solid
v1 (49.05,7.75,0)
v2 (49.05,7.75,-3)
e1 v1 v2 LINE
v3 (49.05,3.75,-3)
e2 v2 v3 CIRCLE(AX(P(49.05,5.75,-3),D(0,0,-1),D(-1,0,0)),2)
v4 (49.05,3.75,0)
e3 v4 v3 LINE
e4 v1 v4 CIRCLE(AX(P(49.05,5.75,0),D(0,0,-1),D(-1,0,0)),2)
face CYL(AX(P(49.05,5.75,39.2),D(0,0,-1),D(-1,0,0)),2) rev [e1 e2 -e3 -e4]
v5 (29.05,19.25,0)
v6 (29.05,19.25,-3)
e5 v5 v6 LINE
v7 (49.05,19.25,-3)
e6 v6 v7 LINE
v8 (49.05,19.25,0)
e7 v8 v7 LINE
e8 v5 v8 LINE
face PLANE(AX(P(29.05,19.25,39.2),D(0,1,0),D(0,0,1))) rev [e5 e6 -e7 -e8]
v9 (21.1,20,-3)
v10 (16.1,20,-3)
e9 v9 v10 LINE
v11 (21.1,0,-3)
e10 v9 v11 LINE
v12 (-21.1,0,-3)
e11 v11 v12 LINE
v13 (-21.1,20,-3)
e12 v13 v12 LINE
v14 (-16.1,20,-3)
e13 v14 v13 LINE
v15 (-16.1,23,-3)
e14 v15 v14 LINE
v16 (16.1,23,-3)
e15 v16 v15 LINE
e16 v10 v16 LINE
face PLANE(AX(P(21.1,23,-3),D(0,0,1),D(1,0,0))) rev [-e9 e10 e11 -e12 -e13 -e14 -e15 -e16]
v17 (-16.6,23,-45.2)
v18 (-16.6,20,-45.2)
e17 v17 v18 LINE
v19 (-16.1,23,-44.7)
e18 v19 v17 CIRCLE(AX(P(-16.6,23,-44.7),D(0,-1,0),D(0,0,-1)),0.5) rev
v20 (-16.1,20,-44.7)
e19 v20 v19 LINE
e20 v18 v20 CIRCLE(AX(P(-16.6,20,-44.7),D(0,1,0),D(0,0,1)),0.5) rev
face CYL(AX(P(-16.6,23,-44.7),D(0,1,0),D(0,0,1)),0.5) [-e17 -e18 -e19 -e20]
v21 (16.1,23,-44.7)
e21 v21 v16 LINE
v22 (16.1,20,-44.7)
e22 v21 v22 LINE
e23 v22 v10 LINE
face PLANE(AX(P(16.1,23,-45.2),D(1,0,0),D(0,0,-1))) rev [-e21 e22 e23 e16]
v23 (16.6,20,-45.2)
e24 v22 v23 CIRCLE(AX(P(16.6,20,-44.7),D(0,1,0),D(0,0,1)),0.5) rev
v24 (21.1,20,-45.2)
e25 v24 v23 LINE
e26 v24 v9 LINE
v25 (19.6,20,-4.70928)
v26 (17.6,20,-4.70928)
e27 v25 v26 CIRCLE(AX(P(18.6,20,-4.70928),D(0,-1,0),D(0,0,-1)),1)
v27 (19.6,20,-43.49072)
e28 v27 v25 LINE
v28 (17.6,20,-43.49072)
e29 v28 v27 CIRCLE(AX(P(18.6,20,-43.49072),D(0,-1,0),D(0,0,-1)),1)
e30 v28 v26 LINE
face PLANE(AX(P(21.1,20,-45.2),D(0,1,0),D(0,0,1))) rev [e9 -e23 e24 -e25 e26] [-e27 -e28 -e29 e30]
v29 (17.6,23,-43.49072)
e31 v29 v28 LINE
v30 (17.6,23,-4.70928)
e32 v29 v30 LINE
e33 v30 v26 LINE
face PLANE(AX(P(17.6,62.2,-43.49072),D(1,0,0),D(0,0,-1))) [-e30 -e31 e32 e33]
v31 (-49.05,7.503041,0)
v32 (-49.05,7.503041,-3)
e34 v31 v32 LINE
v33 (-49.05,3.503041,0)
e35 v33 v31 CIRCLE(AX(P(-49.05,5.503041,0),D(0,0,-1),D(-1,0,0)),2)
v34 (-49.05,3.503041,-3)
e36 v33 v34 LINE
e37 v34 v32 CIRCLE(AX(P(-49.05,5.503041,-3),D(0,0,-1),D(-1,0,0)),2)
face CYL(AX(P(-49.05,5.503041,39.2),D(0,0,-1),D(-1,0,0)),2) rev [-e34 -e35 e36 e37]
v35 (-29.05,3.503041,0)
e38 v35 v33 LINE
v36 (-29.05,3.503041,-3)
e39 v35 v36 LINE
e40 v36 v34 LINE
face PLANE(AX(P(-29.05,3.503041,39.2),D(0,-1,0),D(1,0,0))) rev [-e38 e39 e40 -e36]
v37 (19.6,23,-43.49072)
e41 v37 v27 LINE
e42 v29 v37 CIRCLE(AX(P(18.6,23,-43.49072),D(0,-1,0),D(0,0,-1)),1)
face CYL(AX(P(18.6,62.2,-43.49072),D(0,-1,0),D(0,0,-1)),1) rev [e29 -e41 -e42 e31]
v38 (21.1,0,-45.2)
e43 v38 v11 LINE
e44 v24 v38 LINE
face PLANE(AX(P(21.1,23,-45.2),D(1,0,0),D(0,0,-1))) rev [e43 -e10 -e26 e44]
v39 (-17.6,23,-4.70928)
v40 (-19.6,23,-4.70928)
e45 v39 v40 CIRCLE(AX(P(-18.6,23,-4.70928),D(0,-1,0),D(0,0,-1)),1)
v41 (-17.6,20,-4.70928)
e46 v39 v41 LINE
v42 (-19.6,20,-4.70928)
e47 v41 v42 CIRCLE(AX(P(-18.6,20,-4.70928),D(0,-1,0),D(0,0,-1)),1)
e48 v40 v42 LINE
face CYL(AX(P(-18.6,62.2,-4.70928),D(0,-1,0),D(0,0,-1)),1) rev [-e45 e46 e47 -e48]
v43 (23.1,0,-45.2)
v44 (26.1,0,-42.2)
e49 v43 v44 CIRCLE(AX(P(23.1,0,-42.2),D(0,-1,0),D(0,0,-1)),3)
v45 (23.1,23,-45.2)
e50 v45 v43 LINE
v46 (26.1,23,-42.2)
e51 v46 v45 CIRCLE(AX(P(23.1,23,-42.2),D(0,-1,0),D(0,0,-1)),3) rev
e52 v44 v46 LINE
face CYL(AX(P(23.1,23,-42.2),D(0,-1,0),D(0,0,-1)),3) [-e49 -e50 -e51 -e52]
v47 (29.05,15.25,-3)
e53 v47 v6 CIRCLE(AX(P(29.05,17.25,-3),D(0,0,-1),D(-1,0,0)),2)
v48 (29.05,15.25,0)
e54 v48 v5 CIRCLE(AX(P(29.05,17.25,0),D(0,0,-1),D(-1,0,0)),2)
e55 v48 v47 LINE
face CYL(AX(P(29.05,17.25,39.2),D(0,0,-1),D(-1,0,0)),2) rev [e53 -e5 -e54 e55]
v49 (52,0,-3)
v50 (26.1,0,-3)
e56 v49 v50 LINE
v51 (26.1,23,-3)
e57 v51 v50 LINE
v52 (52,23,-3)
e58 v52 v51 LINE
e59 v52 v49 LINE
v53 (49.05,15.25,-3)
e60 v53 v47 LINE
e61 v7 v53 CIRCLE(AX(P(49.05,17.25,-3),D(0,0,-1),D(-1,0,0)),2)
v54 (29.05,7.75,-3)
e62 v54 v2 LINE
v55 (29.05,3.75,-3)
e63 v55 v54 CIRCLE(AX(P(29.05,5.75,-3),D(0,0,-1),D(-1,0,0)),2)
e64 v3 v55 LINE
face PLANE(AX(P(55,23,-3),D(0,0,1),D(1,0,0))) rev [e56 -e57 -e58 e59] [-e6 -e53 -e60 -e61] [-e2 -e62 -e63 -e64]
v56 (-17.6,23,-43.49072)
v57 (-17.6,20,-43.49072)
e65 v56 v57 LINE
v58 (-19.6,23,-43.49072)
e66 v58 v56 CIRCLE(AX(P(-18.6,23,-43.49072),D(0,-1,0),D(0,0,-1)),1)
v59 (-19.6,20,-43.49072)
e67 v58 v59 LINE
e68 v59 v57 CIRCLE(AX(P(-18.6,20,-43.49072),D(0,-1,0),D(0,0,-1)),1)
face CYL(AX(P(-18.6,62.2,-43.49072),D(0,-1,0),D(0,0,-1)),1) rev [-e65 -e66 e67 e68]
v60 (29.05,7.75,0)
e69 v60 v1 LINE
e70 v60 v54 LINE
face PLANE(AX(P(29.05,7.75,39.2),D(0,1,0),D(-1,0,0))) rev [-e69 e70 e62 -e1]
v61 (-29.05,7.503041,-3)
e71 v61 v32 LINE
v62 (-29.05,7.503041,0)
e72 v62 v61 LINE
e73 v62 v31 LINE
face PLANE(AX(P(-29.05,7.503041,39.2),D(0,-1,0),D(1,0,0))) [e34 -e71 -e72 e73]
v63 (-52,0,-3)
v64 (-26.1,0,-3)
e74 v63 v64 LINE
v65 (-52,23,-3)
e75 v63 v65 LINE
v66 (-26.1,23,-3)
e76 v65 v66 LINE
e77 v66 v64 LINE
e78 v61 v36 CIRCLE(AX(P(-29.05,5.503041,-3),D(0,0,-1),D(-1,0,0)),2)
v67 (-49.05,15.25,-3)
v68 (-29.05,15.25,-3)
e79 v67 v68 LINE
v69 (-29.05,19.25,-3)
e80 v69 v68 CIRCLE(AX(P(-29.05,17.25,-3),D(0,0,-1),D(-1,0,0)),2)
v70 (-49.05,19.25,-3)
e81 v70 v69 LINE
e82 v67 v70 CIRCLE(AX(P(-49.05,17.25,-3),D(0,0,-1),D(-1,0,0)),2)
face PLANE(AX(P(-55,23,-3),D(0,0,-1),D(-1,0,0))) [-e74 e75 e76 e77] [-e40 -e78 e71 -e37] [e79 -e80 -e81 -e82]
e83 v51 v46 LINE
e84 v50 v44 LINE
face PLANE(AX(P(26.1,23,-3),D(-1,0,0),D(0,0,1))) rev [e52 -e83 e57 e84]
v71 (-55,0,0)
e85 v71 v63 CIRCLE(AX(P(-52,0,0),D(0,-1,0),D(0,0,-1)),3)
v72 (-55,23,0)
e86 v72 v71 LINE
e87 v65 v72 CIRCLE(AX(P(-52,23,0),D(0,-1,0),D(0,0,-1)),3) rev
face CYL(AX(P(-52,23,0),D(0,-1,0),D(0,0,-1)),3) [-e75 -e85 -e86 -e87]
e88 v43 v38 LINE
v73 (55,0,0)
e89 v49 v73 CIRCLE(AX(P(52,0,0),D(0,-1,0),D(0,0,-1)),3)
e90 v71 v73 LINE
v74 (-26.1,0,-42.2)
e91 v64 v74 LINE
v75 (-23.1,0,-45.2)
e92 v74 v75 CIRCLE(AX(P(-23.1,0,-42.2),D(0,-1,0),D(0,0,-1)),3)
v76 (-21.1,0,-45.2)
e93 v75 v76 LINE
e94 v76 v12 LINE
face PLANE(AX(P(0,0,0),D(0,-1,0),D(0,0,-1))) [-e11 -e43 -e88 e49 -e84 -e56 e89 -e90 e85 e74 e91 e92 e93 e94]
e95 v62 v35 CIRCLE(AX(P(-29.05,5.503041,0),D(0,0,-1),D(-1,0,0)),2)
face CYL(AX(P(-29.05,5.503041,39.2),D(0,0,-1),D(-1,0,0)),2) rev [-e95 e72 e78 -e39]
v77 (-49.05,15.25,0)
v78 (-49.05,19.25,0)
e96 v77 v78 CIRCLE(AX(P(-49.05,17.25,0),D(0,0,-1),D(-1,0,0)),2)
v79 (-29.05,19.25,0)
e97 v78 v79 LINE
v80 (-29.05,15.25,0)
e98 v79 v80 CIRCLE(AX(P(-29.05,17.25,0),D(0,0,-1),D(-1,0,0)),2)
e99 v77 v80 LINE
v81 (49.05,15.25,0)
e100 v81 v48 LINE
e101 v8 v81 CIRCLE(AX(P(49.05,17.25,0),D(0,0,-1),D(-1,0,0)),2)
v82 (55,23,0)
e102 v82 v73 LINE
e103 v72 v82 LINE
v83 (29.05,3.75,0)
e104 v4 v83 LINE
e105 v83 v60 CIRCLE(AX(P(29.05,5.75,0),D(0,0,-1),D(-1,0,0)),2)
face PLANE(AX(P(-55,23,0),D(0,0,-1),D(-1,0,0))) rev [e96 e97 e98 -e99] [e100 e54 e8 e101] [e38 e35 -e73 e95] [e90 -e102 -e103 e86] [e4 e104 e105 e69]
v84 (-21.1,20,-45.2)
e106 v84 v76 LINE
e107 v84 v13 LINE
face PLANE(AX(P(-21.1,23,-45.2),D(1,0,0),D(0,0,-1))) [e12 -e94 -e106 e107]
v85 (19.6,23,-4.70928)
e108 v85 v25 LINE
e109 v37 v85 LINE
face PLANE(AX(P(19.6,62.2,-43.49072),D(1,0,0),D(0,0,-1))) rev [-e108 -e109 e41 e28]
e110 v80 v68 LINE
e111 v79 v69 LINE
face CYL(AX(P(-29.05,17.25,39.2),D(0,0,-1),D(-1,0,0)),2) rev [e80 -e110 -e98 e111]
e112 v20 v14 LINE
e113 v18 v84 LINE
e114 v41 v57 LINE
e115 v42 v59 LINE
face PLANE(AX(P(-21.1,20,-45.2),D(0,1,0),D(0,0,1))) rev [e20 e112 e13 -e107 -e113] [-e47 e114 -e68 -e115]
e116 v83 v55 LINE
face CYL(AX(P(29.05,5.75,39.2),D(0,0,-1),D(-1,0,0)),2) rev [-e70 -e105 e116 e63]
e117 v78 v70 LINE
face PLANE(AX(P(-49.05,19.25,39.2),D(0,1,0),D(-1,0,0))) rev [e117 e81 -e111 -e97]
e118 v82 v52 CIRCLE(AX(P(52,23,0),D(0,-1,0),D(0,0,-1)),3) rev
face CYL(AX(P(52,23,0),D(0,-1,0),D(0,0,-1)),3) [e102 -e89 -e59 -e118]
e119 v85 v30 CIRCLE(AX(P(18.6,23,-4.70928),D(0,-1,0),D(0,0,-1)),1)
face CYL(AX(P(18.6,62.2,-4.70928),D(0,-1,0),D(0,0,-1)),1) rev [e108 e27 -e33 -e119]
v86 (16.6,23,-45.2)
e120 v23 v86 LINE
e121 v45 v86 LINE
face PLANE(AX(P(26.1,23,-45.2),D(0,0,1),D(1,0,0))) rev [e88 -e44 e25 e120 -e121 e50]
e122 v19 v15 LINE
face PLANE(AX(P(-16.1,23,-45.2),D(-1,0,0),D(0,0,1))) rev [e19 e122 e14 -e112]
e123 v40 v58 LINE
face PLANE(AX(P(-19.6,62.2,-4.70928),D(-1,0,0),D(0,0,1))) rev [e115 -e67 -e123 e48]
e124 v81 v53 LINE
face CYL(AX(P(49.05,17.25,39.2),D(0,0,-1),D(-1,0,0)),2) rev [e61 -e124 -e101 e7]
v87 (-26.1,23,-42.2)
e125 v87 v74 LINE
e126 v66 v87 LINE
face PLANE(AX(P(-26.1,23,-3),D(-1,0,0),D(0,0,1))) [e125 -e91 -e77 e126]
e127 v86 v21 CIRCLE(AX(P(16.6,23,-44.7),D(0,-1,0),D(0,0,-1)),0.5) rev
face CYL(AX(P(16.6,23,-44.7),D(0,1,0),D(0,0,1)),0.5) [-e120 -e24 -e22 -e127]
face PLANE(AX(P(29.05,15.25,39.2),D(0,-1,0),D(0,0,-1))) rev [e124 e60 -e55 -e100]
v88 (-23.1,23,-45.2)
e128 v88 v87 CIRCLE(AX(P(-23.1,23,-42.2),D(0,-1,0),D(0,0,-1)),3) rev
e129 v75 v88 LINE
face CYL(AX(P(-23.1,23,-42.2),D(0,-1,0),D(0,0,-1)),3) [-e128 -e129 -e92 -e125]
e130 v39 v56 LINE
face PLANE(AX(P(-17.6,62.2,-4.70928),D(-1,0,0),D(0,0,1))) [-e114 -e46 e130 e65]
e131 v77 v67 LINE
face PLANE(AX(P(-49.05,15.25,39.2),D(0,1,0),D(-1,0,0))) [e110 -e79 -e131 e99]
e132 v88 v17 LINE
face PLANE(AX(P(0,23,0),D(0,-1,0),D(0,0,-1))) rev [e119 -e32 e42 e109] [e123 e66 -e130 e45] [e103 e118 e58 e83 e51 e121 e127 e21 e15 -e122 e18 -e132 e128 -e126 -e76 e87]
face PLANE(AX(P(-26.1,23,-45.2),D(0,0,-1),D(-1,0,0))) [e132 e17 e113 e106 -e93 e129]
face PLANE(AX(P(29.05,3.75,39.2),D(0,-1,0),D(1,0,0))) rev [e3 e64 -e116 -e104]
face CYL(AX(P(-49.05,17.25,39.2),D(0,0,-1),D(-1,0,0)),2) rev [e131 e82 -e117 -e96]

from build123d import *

# Parameters (mm, degrees)
BOSS_EXTRUDE5_DEPTH = 23
SKETCH3_W           = 5
SKETCH3_H           = 3
BOSS_EXTRUDE7_DEPTH = 42.2
CUT_EXTRUDE3_DEPTH  = 42.2
CUT_EXTRUDE4_DEPTH  = 42.2
FILLET1_R           = 3
FILLET2_R           = 3
FILLET3_R           = 0.5
FILLET4_R           = 0.5
FILLET5_R           = 3
FILLET6_R           = 3
CUT_EXTRUDE5_DEPTH  = 42.2
CUT_EXTRUDE6_DEPTH  = 42.2
CUT_EXTRUDE7_DEPTH  = 42.2


with BuildPart() as part:
    # Sketch1 → Boss-Extrude5 (new body)
    with BuildSketch(Plane(origin=(0, 0, 0), x_dir=(1, 0, 0), z_dir=(0, 1, 0))):
        Polygon((-55, 0), (55, 0), (55, 3), (26.1, 3), (26.1, 45.2), (21.1, 45.2), (21.1, 3), (-21.1, 3), (-21.1, 45.2), (-26.1, 45.2), (-26.1, 3), (-55, 3), align=None)
    extrude(amount=BOSS_EXTRUDE5_DEPTH)

    # Sketch3 → Boss-Extrude7 (add)
    with BuildSketch(Plane(origin=(0, 0, -3), x_dir=(-1, 0, 0), z_dir=(0, 0, -1))):
        with Locations((-18.6, 21.5)):
            Rectangle(SKETCH3_W, SKETCH3_H)
        with Locations((18.6, 21.5)):
            Rectangle(SKETCH3_W, SKETCH3_H)
    extrude(amount=BOSS_EXTRUDE7_DEPTH)

    # Sketch5 → Cut-Extrude3 (cut)
    with BuildSketch(Plane(origin=(0, 20, 0), x_dir=(-1, 0, 0), z_dir=(0, -1, 0))):
        with BuildLine():
            Line((-17.6, 43.490720045), (-17.6, 4.709279955))
            ThreePointArc((-17.6, 4.709279955), (-18.6, 3.709279955), (-19.6, 4.709279955))
            Line((-19.6, 4.709279955), (-19.6, 43.490720045))
            ThreePointArc((-19.6, 43.490720045), (-18.6, 44.490720045), (-17.6, 43.490720045))
        make_face()
    extrude(amount=-CUT_EXTRUDE3_DEPTH, mode=Mode.SUBTRACT)

    # Sketch5<4> → Cut-Extrude4 (cut)
    with BuildSketch(Plane(origin=(0, 20, 0), x_dir=(-1, 0, 0), z_dir=(0, -1, 0))):
        with BuildLine():
            Line((17.6, 4.709279955), (17.6, 43.490720045))
            ThreePointArc((17.6, 43.490720045), (18.6, 44.490720045), (19.6, 43.490720045))
            Line((19.6, 43.490720045), (19.6, 4.709279955))
            ThreePointArc((19.6, 4.709279955), (18.6, 3.709279955), (17.6, 4.709279955))
        make_face()
    extrude(amount=-CUT_EXTRUDE4_DEPTH, mode=Mode.SUBTRACT)

    # Fillet1
    fillet1_edges = [part.edges().sort_by_distance(p)[0] for p in [
        (-26.1, 11.5, -45.2),
    ]]
    fillet(fillet1_edges, radius=FILLET1_R)

    # Fillet2
    fillet2_edges = [part.edges().sort_by_distance(p)[0] for p in [
        (26.1, 11.5, -45.2),
    ]]
    fillet(fillet2_edges, radius=FILLET2_R)

    # Fillet3
    fillet3_edges = [part.edges().sort_by_distance(p)[0] for p in [
        (-16.1, 21.5, -45.2),
    ]]
    fillet(fillet3_edges, radius=FILLET3_R)

    # Fillet4
    fillet4_edges = [part.edges().sort_by_distance(p)[0] for p in [
        (16.1, 21.5, -45.2),
    ]]
    fillet(fillet4_edges, radius=FILLET4_R)

    # Fillet5
    fillet5_edges = [part.edges().sort_by_distance(p)[0] for p in [
        (55, 11.5, -3),
    ]]
    fillet(fillet5_edges, radius=FILLET5_R - 0.0001)  # a hair under: the kernel refuses the full size

    # Fillet6
    fillet6_edges = [part.edges().sort_by_distance(p)[0] for p in [
        (-55, 11.5, -3),
    ]]
    fillet(fillet6_edges, radius=FILLET6_R - 0.0001)  # a hair under: the kernel refuses the full size

    # Sketch6 → Cut-Extrude5 (cut)
    with BuildSketch(Plane(origin=(0, 0, -3), x_dir=(-1, 0, 0), z_dir=(0, 0, -1))):
        with BuildLine():
            Line((-29.05, 15.25), (-49.05, 15.25))
            ThreePointArc((-49.05, 15.25), (-51.05, 17.25), (-49.05, 19.25))
            Line((-49.05, 19.25), (-29.05, 19.25))
            ThreePointArc((-29.05, 19.25), (-27.05, 17.25), (-29.05, 15.25))
        make_face()
        with BuildLine():
            Line((-29.05, 3.75), (-49.05, 3.75))
            ThreePointArc((-49.05, 3.75), (-51.05, 5.75), (-49.05, 7.75))
            Line((-49.05, 7.75), (-29.05, 7.75))
            ThreePointArc((-29.05, 7.75), (-27.05, 5.75), (-29.05, 3.75))
        make_face()
    extrude(amount=-CUT_EXTRUDE5_DEPTH, mode=Mode.SUBTRACT)

    # Sketch7 → Cut-Extrude6 (cut)
    with BuildSketch(Plane(origin=(0, 0, -3), x_dir=(-1, 0, 0), z_dir=(0, 0, -1))):
        with BuildLine():
            Line((49.05, 15.25), (29.05, 15.25))
            ThreePointArc((29.05, 15.25), (27.05, 17.25), (29.05, 19.25))
            Line((29.05, 19.25), (49.05, 19.25))
            ThreePointArc((49.05, 19.25), (51.05, 17.25), (49.05, 15.25))
        make_face()
    extrude(amount=-CUT_EXTRUDE6_DEPTH, mode=Mode.SUBTRACT)

    # Sketch7<3> → Cut-Extrude7 (cut)
    with BuildSketch(Plane(origin=(0, 0, -3), x_dir=(-1, 0, 0), z_dir=(0, 0, -1))):
        with BuildLine():
            Line((29.05, 7.503040911), (49.05, 7.503040911))
            ThreePointArc((49.05, 7.503040911), (51.05, 5.503040911), (49.05, 3.503040911))
            Line((49.05, 3.503040911), (29.05, 3.503040911))
            ThreePointArc((29.05, 3.503040911), (27.05, 5.503040911), (29.05, 7.503040911))
        make_face()
    extrude(amount=-CUT_EXTRUDE7_DEPTH, mode=Mode.SUBTRACT)


solid = part.part
